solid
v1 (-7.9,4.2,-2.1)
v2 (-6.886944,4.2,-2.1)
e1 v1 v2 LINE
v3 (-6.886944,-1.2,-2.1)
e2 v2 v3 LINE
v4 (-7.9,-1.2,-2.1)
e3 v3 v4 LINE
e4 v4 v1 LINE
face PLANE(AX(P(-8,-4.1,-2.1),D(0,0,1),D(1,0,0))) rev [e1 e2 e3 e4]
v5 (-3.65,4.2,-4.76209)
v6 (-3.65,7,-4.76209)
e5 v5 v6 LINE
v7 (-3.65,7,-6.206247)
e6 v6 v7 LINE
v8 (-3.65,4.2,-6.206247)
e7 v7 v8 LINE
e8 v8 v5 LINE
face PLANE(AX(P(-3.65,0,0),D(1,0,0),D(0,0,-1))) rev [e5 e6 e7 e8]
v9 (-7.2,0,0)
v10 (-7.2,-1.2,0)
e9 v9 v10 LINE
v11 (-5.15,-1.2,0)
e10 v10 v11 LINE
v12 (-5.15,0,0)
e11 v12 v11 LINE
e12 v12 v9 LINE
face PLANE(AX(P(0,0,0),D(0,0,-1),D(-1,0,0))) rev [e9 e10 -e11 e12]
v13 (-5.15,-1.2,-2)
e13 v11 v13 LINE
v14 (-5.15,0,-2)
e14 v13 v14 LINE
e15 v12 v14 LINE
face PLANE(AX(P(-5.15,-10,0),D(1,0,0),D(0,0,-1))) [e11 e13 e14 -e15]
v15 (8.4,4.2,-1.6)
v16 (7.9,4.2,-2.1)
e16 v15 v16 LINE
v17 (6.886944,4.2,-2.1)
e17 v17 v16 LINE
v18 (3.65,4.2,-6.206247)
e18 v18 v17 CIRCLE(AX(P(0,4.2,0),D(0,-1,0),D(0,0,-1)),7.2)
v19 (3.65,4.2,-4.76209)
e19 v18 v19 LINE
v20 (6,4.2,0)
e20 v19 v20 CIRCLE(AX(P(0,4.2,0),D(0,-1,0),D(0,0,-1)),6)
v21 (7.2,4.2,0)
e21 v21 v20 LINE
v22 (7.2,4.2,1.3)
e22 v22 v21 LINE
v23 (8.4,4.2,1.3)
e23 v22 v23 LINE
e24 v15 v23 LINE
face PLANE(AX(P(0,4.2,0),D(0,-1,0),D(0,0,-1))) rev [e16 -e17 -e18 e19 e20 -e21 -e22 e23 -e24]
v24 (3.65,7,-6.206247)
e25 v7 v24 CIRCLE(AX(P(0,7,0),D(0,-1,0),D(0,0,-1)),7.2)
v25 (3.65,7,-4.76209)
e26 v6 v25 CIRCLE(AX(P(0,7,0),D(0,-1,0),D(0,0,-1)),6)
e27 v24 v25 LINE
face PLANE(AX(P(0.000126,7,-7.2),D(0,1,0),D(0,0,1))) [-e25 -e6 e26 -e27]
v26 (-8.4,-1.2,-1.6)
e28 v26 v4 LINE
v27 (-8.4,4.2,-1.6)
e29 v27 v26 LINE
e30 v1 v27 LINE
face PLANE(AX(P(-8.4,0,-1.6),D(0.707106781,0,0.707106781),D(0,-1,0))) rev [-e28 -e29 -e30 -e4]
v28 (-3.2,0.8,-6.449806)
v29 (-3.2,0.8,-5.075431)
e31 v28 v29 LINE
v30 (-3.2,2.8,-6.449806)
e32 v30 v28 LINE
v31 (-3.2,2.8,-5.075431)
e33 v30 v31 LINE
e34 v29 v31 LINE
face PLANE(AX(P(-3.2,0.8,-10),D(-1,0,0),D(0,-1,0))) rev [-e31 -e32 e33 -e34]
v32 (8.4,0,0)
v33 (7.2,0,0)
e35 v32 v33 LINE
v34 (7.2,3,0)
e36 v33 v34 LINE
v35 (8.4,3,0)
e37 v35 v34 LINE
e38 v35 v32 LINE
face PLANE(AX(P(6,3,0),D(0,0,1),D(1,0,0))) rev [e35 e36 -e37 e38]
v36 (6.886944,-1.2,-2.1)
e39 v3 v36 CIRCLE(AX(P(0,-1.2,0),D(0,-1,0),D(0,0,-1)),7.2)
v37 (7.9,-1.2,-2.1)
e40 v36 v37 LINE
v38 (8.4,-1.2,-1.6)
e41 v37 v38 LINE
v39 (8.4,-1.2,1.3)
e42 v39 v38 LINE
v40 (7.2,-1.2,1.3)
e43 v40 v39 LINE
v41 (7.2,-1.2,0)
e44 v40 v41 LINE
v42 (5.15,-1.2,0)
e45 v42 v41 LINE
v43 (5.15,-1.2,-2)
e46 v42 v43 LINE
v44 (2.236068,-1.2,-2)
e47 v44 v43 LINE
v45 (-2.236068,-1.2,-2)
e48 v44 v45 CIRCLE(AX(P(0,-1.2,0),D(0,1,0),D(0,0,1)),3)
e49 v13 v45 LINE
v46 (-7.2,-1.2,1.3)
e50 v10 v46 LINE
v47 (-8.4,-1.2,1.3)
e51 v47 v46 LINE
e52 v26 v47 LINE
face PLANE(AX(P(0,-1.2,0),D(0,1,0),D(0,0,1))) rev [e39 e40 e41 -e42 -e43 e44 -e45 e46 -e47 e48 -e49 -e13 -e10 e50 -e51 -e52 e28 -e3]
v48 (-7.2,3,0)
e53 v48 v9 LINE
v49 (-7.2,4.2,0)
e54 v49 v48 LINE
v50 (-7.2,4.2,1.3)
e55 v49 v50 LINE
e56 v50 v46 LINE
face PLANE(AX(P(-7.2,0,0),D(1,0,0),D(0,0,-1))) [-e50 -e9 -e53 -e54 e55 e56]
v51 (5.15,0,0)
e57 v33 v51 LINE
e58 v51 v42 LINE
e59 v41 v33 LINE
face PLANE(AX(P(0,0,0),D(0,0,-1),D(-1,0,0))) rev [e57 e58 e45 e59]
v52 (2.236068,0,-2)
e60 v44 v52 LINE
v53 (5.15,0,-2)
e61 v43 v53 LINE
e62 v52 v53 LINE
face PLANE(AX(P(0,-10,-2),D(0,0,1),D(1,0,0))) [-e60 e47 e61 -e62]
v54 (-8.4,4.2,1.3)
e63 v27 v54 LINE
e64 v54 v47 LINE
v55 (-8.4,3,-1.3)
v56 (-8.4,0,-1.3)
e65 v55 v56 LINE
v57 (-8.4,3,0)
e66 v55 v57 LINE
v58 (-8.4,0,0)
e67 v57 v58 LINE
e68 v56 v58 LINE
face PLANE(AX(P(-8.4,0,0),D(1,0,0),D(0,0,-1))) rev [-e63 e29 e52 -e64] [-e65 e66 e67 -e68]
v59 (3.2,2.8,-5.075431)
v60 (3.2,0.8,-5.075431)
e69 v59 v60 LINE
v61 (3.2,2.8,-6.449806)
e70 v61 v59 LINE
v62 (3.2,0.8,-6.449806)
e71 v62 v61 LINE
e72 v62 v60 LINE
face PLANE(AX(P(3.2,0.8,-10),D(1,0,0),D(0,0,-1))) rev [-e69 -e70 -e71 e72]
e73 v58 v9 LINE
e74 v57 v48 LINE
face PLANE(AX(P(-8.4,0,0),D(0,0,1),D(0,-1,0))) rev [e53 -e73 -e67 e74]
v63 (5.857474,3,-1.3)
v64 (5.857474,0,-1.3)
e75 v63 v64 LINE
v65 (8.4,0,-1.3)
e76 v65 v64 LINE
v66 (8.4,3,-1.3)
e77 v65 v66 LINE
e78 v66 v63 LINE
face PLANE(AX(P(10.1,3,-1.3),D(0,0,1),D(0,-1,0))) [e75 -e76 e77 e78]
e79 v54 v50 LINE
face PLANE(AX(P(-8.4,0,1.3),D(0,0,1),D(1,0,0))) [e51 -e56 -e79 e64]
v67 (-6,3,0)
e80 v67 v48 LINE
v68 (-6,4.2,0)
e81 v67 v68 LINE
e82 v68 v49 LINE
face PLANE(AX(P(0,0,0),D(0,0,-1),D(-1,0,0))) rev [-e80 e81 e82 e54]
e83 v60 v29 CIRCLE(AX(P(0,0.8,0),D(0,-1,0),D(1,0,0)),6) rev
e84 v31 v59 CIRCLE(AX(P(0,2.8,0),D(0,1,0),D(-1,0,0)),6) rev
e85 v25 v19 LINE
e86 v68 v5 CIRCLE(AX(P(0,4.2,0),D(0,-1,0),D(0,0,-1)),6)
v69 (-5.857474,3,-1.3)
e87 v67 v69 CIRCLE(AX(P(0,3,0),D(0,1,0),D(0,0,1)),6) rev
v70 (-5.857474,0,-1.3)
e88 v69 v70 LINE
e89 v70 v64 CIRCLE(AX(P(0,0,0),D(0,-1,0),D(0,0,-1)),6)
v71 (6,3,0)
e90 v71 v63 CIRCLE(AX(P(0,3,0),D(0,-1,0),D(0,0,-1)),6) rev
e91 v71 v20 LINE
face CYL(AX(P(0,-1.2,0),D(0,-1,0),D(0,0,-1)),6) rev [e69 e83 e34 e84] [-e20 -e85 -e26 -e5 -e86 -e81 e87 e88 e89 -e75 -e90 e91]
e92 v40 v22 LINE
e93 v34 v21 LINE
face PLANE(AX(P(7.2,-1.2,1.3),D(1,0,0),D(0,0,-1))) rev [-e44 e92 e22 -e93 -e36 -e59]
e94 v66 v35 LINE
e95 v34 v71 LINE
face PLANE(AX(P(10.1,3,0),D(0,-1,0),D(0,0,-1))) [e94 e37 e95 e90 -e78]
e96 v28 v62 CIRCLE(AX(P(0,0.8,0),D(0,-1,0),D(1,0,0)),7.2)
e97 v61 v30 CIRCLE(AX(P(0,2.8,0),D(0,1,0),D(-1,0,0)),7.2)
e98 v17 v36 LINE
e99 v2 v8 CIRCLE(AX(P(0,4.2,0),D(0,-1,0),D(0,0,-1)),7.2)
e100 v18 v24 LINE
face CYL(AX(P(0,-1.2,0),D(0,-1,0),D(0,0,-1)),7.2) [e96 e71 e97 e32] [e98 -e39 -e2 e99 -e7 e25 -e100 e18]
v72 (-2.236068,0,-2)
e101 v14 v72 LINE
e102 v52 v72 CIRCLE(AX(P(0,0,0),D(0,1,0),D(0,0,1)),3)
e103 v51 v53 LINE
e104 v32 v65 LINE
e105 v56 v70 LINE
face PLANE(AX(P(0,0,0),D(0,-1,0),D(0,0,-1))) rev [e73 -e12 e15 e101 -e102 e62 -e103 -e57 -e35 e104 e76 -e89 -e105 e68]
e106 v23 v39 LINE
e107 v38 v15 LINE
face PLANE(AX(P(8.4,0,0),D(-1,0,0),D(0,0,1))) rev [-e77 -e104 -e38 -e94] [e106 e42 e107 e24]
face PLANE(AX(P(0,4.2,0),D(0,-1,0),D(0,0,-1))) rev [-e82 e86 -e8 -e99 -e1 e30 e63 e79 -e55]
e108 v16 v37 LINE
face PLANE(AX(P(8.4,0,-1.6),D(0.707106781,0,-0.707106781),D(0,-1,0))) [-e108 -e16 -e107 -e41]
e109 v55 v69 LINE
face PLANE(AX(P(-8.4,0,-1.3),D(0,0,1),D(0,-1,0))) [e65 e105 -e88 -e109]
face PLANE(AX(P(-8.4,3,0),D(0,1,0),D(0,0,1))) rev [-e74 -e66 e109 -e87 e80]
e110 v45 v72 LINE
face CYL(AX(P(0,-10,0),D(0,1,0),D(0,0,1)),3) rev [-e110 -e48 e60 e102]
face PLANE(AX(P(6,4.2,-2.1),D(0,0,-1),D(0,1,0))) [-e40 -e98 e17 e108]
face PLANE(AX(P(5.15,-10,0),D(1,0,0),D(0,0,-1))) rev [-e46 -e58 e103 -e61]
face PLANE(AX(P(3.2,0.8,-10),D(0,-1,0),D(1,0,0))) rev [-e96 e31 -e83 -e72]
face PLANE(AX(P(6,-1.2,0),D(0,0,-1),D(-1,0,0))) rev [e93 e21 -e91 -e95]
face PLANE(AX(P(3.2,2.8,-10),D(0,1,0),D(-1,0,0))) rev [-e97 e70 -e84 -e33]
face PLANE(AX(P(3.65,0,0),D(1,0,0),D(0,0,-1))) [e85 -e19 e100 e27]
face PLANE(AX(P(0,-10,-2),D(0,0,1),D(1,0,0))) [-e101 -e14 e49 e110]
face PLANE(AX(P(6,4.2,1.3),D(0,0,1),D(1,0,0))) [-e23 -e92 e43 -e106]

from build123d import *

# Parameters (mm, degrees)
SKETCH1_W                 = 6
SKETCH1_H                 = 1.2
SKETCH1_W_2               = 1.2
SKETCH1_H_2               = 4.2
REVOLVE1_ANGLE            = 180
REVOLVE2_START            = 4.2
REVOLVE2_DEPTH            = 2.8
SKETCH4_W                 = 6.4
SKETCH4_H                 = 2
CUT_EXTRUDE1_DEPTH        = 10
CUT_EXTRUDE2_DEPTH        = 10
BOSS_EXTRUDE6_DEPTH       = 1.2
SKETCH12_W                = 2
SKETCH12_H                = 2.1
BOSS_EXTRUDE15_DEPTH      = 5.4
SKETCH13_W                = 1.3
SKETCH13_H                = 3
CUT_EXTRUDE4_DEPTH        = 4
CUT_EXTRUDE5_DEPTH        = 4
CUT_EXTRUDE5_DEPTH_BACK   = 4
SKETCH14_W                = 1.3
SKETCH14_H                = 3
BOSS_EXTRUDE16_DEPTH      = 2.3
BOSS_EXTRUDE16_DEPTH_BACK = 0.1
SKETCH15_W                = 3.4
SKETCH15_H                = 5.4
SKETCH15_W_2              = 1.3
SKETCH15_H_2              = 3
SKETCH16_W                = 1.2
SKETCH16_H                = 1.3
CUT_EXTRUDE6_DEPTH        = 13.310970717
CHAMFER2_SIZE             = 0.5


# Read off the part's stored shape, not the designer's step: Revolve2
with BuildPart() as part:
    # Sketch1 → Revolve1 (revolve)
    with BuildSketch(Plane.XY):
        with Locations((3, -0.6)):
            Rectangle(SKETCH1_W, SKETCH1_H)
        with Locations((6.6, -0.6)):
            Rectangle(SKETCH1_W_2, SKETCH1_H)
        with Locations((6.6, 2.1)):
            Rectangle(SKETCH1_W_2, SKETCH1_H_2)
    revolve(axis=Axis((0, -1.2, 0), (0, 1, 0)), revolution_arc=REVOLVE1_ANGLE)

    # Revolve2 outline → Revolve2 (add)
    with BuildSketch(Plane(origin=(0, 0, 0), x_dir=(1, 0, 0), z_dir=(0, 1, 0)).offset(REVOLVE2_START)):
        with BuildLine():
            ThreePointArc((3.65, 6.206246853), (0, 7.2), (-3.65, 6.206246853))
            Line((-3.65, 6.206246853), (-3.65, 4.762089877))
            ThreePointArc((-3.65, 4.762089877), (0, 6), (3.65, 4.762089877))
            Line((3.65, 4.762089877), (3.65, 6.206246853))
        make_face()
    extrude(amount=REVOLVE2_DEPTH)

    # Sketch4 → Cut-Extrude1 (cut)
    with BuildSketch(Plane.XY):
        with Locations((0, 1.8)):
            Rectangle(SKETCH4_W, SKETCH4_H)
    extrude(amount=-CUT_EXTRUDE1_DEPTH, mode=Mode.SUBTRACT)

    # Sketch5 → Cut-Extrude2 (cut)
    with BuildSketch(Plane(origin=(0, 0, 0), x_dir=(1, 0, 0), z_dir=(0, 1, 0))):
        with BuildLine():
            Line((-5.15, 2), (-5.15, 0))
            Line((-5.15, 0), (-3, 0))
            ThreePointArc((-3, 0), (-2.802517077, 1.070466269), (-2.236067977, 2))
            Line((-2.236067977, 2), (-5.15, 2))
        make_face()
        with BuildLine():
            ThreePointArc((-2.236067977, 2), (-2.802517077, 1.070466269), (-3, 0))
            Line((-3, 0), (3, 0))
            ThreePointArc((3, 0), (2.802517077, 1.070466269), (2.236067977, 2))
            Line((2.236067977, 2), (-2.236067977, 2))
        make_face()
        with BuildLine():
            Line((-5.15, 0), (-5.15, -2))
            Line((-5.15, -2), (-2.236067977, -2))
            ThreePointArc((-2.236067977, -2), (-2.802517077, -1.070466269), (-3, 0))
            Line((-3, 0), (-5.15, 0))
        make_face()
        with BuildLine():
            ThreePointArc((-3, 0), (-2.802517077, -1.070466269), (-2.236067977, -2))
            Line((-2.236067977, -2), (2.236067977, -2))
            ThreePointArc((2.236067977, -2), (2.802517077, -1.070466269), (3, 0))
            Line((3, 0), (-3, 0))
        make_face()
        with BuildLine():
            ThreePointArc((2.236067977, 2), (0, 3), (-2.236067977, 2))
            Line((-2.236067977, 2), (2.236067977, 2))
        make_face()
        with BuildLine():
            ThreePointArc((2.236067977, 2), (2.802517077, 1.070466269), (3, 0))
            Line((3, 0), (5.15, 0))
            Line((5.15, 0), (5.15, 2))
            Line((5.15, 2), (2.236067977, 2))
        make_face()
        with BuildLine():
            ThreePointArc((3, 0), (2.802517077, -1.070466269), (2.236067977, -2))
            Line((2.236067977, -2), (5.15, -2))
            Line((5.15, -2), (5.15, 0))
            Line((5.15, 0), (3, 0))
        make_face()
    extrude(amount=-CUT_EXTRUDE2_DEPTH, mode=Mode.SUBTRACT)



with BuildPart() as body_2:
    # Sketch9 → Boss-Extrude6 (new body)
    with BuildSketch(Plane(origin=(-7.2, 0, 0), x_dir=(0, 0, -1), z_dir=(1, 0, 0))):
        Polygon((2.1, -1.2), (2.1, 4.2), (0, 4.2), (0, 3), (1.3, 3), (1.3, 0), (0, 0), (0, -1.2), align=None)
        Polygon((0, 3), (0, 4.2), (-1.3, 4.2), (-1.3, -1.2), (0, -1.2), (0, 0), align=None)
    extrude(amount=-BOSS_EXTRUDE6_DEPTH)


with BuildPart() as part_1:
    add(part.part)

    add(body_2.part)  # Boss-Extrude15 merges body 2
    # Sketch12 → Boss-Extrude15 (add)
    with BuildSketch(Plane(origin=(0, 4.2, 0), x_dir=(1, 0, 0), z_dir=(0, 1, 0))):
        with Locations((-7, 1.05)):
            Rectangle(SKETCH12_W, SKETCH12_H)
    extrude(amount=-BOSS_EXTRUDE15_DEPTH)

    # Sketch13 → Cut-Extrude4 (cut)
    with BuildSketch(Plane.ZY.offset(8.4)):
        with Locations((-0.65, 1.5)):
            Rectangle(SKETCH13_W, SKETCH13_H)
    extrude(amount=-CUT_EXTRUDE4_DEPTH, mode=Mode.SUBTRACT)

    # Sketch14 → Cut-Extrude5 (cut, two sides: drawn at the far end of the back side and taken through both)
    with BuildSketch(Plane(origin=(6.1, 0, 0), x_dir=(0, 0, -1), z_dir=(1, 0, 0)).offset(-CUT_EXTRUDE5_DEPTH_BACK)):
        with Locations((0.65, 1.5)):
            Rectangle(SKETCH14_W, SKETCH14_H)
    extrude(amount=CUT_EXTRUDE5_DEPTH + CUT_EXTRUDE5_DEPTH_BACK, mode=Mode.SUBTRACT)

    # Sketch15 → Boss-Extrude16 (add, two sides: drawn at the far end of the back side and taken through both)
    with BuildSketch(Plane(origin=(6.1, 0, 0), x_dir=(0, 0, -1), z_dir=(1, 0, 0)).offset(-BOSS_EXTRUDE16_DEPTH_BACK)):
        with Locations((0.4, 1.5)):
            Rectangle(SKETCH15_W, SKETCH15_H)
        with Locations((0.65, 1.5)):
            Rectangle(SKETCH15_W_2, SKETCH15_H_2, mode=Mode.SUBTRACT)
    extrude(amount=BOSS_EXTRUDE16_DEPTH + BOSS_EXTRUDE16_DEPTH_BACK)

    # Sketch16 → Cut-Extrude6 (cut, through all)
    with BuildSketch(Plane(origin=(0, 4.2, 0), x_dir=(1, 0, 0), z_dir=(0, 1, 0))):
        with Locations((6.6, -0.65)):
            Rectangle(SKETCH16_W, SKETCH16_H)
    extrude(amount=-CUT_EXTRUDE6_DEPTH, mode=Mode.SUBTRACT)

    # Chamfer2
    chamfer2_edges = [part_1.edges().sort_by_distance(p)[0] for p in [
        (-8.4, 1.5, -2.1),
        (8.4, 1.5, -2.1),
    ]]
    chamfer(chamfer2_edges, length=CHAMFER2_SIZE)


solid = part_1.part
